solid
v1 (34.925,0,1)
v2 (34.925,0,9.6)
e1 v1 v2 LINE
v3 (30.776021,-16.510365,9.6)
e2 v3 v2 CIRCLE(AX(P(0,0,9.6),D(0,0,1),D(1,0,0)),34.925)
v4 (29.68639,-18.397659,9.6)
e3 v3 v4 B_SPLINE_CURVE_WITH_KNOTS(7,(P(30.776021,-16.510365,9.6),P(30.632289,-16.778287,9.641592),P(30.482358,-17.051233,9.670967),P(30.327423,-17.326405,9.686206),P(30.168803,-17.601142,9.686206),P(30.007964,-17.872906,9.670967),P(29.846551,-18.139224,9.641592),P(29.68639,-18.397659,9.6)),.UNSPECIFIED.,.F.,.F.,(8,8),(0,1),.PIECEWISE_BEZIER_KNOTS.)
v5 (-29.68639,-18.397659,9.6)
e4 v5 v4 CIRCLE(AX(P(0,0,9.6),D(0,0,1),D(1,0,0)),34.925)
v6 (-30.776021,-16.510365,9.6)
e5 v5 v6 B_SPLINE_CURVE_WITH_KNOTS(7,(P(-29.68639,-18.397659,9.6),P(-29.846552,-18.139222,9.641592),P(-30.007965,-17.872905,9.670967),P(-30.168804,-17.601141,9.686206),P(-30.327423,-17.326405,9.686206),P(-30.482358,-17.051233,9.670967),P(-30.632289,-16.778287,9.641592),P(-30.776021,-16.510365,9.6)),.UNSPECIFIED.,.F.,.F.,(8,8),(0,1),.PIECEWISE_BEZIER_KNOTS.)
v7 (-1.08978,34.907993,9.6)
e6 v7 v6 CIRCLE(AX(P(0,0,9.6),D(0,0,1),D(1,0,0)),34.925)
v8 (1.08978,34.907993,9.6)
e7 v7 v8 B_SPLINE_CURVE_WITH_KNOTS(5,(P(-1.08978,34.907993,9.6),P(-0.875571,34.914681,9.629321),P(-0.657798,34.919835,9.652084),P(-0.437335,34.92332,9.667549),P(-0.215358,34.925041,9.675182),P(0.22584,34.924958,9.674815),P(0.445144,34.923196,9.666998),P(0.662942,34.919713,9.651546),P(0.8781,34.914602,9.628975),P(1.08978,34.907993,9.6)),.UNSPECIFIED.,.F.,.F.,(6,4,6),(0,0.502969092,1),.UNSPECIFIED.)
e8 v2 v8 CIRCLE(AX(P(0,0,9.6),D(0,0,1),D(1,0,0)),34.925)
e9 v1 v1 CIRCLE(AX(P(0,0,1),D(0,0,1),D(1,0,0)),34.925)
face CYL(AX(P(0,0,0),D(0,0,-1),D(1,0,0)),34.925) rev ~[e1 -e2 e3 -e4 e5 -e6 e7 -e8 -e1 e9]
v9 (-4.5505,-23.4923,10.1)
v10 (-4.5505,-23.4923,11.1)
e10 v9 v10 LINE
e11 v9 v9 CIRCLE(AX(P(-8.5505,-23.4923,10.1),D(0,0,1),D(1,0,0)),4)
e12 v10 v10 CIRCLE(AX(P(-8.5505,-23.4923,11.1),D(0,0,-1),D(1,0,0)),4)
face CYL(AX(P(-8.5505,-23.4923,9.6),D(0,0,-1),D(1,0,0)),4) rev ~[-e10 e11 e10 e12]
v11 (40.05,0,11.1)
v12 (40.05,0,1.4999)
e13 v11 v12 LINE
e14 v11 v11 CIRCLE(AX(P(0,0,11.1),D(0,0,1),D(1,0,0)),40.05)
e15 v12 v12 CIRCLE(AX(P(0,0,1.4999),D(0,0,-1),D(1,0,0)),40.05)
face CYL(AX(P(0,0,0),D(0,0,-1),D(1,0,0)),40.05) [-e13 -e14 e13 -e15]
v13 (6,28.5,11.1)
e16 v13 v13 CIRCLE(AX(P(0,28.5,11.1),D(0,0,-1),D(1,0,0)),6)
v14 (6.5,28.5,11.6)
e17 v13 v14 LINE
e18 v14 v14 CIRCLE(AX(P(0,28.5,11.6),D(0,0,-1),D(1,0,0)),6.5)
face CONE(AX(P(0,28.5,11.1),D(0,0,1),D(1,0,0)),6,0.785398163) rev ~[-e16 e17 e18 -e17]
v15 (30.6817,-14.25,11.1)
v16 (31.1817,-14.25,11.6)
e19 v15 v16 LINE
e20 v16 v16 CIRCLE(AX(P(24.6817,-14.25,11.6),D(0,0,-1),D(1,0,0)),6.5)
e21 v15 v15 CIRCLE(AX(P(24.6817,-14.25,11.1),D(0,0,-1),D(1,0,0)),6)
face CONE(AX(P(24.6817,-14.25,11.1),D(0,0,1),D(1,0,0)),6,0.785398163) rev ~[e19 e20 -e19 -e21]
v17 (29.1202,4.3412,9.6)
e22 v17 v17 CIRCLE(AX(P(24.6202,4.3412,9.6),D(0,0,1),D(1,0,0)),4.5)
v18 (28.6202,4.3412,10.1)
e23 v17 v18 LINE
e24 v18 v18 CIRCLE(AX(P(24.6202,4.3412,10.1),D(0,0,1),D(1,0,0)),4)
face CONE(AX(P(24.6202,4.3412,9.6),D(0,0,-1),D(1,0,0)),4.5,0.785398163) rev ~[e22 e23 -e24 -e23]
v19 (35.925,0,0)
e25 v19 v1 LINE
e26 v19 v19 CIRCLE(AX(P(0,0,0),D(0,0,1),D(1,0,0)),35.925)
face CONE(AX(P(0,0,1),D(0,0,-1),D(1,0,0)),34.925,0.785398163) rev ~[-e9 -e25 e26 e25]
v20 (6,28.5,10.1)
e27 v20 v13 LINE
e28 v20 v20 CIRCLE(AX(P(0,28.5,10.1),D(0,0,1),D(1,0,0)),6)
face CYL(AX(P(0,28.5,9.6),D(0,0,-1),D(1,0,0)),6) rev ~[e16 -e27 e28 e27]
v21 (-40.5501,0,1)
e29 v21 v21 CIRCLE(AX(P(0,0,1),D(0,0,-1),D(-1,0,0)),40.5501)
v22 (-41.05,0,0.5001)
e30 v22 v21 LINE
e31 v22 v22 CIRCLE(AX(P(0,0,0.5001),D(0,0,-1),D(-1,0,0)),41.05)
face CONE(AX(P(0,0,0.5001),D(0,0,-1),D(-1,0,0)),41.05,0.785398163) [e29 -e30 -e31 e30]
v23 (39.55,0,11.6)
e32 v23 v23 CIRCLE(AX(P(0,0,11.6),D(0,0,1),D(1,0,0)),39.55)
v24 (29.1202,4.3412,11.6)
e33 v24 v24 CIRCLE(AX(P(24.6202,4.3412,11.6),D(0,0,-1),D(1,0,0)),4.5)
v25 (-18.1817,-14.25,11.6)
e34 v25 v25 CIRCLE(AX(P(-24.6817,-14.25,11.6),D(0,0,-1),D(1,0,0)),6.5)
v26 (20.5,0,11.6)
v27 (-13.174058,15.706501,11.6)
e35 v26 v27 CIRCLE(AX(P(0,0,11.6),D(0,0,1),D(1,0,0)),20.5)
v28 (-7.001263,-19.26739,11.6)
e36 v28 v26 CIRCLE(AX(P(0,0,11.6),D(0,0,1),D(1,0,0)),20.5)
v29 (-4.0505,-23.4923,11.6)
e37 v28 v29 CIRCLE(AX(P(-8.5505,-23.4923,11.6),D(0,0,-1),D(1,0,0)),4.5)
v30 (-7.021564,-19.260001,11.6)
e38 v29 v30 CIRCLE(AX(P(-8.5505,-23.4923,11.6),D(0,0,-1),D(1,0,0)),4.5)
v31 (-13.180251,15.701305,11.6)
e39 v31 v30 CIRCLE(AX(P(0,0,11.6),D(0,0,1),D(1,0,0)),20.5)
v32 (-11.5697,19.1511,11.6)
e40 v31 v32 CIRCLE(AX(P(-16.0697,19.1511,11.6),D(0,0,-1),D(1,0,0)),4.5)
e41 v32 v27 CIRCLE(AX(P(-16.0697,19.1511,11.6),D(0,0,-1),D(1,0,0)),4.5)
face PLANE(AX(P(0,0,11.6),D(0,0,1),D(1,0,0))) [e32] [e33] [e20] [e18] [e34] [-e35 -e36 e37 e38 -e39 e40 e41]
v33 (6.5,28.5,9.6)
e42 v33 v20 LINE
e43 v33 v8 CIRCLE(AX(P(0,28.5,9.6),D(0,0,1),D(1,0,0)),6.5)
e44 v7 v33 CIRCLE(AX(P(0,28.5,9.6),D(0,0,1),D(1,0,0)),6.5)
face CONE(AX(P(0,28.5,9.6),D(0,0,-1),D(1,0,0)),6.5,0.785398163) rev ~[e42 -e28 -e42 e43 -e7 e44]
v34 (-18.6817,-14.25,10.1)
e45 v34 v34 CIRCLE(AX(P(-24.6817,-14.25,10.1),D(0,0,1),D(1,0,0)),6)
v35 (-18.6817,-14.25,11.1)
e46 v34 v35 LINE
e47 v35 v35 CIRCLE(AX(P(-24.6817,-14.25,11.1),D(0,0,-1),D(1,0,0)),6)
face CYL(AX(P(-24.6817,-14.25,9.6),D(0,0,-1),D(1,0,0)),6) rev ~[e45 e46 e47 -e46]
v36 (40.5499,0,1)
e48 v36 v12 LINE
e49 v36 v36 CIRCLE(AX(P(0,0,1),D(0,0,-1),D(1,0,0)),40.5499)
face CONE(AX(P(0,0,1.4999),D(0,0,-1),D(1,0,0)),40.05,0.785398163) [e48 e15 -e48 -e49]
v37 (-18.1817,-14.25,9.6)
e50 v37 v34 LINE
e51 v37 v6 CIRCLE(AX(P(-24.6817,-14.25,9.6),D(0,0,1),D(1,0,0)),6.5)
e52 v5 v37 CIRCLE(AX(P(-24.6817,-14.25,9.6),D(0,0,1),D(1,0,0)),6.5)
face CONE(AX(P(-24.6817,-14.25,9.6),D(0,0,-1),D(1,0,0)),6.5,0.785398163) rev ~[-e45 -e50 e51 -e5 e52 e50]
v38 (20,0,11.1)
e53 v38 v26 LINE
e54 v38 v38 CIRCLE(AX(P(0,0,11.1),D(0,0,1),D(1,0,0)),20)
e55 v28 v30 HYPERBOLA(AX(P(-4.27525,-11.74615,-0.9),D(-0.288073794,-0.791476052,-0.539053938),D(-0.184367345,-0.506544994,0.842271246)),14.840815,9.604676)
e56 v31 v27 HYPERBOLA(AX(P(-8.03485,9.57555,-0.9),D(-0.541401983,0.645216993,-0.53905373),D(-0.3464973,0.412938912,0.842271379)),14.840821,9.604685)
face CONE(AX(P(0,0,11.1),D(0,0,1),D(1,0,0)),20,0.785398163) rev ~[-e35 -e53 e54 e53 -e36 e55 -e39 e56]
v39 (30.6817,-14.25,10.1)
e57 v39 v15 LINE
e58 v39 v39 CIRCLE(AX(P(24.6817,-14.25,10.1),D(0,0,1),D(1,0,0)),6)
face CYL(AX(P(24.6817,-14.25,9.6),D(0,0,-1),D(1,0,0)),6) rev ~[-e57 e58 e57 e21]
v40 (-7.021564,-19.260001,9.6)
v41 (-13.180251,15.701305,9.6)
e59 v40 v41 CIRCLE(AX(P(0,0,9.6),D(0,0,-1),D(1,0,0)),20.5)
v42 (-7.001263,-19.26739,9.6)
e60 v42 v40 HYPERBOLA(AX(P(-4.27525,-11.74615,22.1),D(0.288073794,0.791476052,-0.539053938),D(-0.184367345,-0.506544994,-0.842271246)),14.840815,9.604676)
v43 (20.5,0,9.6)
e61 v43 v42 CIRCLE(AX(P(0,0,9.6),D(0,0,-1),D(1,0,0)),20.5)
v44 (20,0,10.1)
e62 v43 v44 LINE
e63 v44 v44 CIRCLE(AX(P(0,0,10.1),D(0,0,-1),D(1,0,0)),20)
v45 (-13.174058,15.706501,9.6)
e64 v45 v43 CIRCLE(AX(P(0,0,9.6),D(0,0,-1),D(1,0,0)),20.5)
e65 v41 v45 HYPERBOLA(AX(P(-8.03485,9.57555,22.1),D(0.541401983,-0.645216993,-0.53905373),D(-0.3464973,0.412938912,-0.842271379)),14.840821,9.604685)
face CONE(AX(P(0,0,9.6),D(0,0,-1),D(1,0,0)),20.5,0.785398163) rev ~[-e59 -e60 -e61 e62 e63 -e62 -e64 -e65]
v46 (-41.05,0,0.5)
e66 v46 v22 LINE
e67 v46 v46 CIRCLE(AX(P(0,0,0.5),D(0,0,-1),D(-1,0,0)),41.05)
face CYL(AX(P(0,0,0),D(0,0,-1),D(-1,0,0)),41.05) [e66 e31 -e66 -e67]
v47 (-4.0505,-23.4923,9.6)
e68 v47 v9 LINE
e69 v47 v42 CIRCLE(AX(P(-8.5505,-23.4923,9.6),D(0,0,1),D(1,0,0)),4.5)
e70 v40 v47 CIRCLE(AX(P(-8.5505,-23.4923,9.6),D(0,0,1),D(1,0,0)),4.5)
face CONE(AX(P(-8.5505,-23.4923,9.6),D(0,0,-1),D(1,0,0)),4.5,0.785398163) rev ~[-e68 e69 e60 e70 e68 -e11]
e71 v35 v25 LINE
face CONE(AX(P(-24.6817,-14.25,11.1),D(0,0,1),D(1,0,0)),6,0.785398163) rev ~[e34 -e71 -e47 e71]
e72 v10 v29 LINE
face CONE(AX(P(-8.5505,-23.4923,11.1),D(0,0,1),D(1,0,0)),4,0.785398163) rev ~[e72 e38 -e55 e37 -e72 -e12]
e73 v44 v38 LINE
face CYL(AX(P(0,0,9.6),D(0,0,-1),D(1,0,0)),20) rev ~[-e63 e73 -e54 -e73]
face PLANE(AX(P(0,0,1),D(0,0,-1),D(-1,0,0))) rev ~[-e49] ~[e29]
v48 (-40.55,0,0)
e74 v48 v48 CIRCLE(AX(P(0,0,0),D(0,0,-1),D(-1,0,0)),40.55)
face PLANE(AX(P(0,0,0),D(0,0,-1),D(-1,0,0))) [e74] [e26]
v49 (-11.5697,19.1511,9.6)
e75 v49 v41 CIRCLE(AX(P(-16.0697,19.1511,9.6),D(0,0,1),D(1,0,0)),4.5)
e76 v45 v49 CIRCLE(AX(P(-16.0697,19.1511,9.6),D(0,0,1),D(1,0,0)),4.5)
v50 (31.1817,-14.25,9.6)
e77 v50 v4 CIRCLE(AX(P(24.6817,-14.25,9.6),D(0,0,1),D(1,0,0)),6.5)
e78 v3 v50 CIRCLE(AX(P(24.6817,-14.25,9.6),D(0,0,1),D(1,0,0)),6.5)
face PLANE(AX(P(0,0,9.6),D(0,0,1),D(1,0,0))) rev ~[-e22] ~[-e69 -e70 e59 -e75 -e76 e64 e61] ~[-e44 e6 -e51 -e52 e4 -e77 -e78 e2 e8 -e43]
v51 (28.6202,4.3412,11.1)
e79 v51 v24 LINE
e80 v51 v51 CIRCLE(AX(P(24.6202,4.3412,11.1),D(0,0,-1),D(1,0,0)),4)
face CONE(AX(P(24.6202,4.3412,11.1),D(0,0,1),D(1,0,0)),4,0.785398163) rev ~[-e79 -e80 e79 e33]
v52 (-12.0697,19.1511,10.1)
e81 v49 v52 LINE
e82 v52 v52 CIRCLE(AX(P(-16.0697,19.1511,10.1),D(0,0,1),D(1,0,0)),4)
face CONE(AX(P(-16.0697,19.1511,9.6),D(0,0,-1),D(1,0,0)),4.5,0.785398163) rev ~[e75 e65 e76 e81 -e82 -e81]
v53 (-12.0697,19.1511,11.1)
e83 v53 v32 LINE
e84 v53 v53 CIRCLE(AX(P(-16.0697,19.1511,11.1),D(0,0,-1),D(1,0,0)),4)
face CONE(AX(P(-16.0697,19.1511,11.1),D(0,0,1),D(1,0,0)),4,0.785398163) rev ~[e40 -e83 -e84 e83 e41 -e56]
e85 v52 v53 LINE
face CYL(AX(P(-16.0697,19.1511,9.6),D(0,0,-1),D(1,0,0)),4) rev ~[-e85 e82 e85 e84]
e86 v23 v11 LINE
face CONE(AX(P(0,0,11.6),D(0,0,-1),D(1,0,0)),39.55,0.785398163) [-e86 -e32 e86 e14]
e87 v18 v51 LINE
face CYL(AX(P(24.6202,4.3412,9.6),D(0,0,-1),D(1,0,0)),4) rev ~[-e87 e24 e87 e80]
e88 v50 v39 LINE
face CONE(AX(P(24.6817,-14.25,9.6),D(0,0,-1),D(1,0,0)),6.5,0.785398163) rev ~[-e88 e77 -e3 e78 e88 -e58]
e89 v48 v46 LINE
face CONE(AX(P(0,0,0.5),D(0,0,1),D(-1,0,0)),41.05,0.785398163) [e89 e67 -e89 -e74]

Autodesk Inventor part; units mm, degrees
ref_plane "YZ Plane" through (0, 0, 0) normal (1, 0, 0) x (0, 1, 0)
ref_plane "XZ Plane" through (0, 0, 0) normal (0, 1, 0) x (-1, 0, 0)
ref_plane "XY Plane" through (0, 0, 0) normal (0, 0, 1) x (1, 0, 0)
sketch "Sketch1" plane through (0, 0, 0) normal (0, 0, 1) x (1, 0, 0)
  circle A0 centre (0, 0) radius 40.05
  circle A1 centre (0, 0) radius 34.925
  dimension "d0" = 80.1
  dimension "d1" = 69.85
extrude "Extrusion1" add sketch "Sketch1" along normal blind 9.6
sketch "Sketch2" plane through (0, 0, 9.6) normal (0, 0, 1) x (1, 0, 0)
  circle A0 centre (0, 0) radius 20
  circle A1 centre (0, 0) radius 40.05 projected
  line L0 (0, 0) -> (0, 61.5181)
  circle A2 centre (0, 0) radius 28.5
  circle A3 centre (0, 0) radius 25
  line L1 (0, 0) -> (-40.7696, 48.5873)
  circle A4 centre (0, 28.5) radius 6
  circle A5 centre (-16.0697, 19.1511) radius 4
  circle A6 centre (-24.6817, -14.25) radius 6
  circle A7 centre (-8.5505, -23.4923) radius 4
  circle A8 centre (24.6817, -14.25) radius 6
  circle A9 centre (24.6202, 4.3412) radius 4
  point P0 (21.1514, -19.1015)
  point P1 (28.352, 2.9011)
  point P2 (23.6127, 8.2122)
  point P3 (19.0171, -16.228)
  point P4 (24.9974, 0.359)
  point P5 (27.6344, 6.9708)
  point P6 (23.5624, -8.3553)
  point P7 (27.1181, -8.7669)
  dimension "d5" = 57
  dimension "d6" = 50
  dimension "d4" = 40
  dimension "d7" = 12
  dimension "d8" = 40
  dimension "d9" = 8
  dimension "d12" = 360
extrude "Extrusion2" add sketch "Sketch2" along normal blind 2 contours A0 L0 A4 A3 A9 A8 A7 A6 A5 L1 | A0 L1 A5 A3 A4 L0 | A3 A5 A2 A4 | A4 A2 A9 A3 | A3 A6 A2 A5 | A2 A5 L1 A1 L0 A4 | A4 L0 A1 L1 A5 A2 A6 A7 A8 A9 | A9 A2 A8 A3 | A3 A7 A2 A6 | A3 A8 A2 A7
sketch "Sketch3" plane through (0, 0, 0) normal (0, 0, -1) x (-1, 0, 0)
  circle A0 centre (0, 0) radius 40.05 projected
  circle A1 centre (0, 0) radius 41.05
  dimension "d16" = 1
extrude "Extrusion3" add sketch "Sketch3" against normal blind 1
chamfer "Chamfer1" distance 0.5 angle 45 2 edges at (-40.05, 0, 1) (41.05, 0, 1)
chamfer "Chamfer2" distance 1 angle 45 1 edges at (-34.925, 0, 0)
chamfer "Chamfer3" distance 0.5 angle 45 1 edges at (41.05, 0, 0)
chamfer "Chamfer4" distance 0.5 angle 45 15 edges at (-40.05, 0, 11.6) (-6, 28.5, 11.6) (-20.0697, 19.1511, 11.6) (18.6817, -14.25, 11.6) (20.6202, 4.3412, 11.6) (-30.6817, -14.25, 11.6) (-12.5505, -23.4923, 11.6) (-20, 0, 11.6) (-20, 0, 9.6) (-12.5505, -23.4923, 9.6) (-30.6817, -14.25, 9.6) (20.6202, 4.3412, 9.6) (18.6817, -14.25, 9.6) (-6, 28.5, 9.6) (-20.0697, 19.1511, 9.6)
properties part number "planet_bearing_spacer" material "PC/ABS Plastic"
